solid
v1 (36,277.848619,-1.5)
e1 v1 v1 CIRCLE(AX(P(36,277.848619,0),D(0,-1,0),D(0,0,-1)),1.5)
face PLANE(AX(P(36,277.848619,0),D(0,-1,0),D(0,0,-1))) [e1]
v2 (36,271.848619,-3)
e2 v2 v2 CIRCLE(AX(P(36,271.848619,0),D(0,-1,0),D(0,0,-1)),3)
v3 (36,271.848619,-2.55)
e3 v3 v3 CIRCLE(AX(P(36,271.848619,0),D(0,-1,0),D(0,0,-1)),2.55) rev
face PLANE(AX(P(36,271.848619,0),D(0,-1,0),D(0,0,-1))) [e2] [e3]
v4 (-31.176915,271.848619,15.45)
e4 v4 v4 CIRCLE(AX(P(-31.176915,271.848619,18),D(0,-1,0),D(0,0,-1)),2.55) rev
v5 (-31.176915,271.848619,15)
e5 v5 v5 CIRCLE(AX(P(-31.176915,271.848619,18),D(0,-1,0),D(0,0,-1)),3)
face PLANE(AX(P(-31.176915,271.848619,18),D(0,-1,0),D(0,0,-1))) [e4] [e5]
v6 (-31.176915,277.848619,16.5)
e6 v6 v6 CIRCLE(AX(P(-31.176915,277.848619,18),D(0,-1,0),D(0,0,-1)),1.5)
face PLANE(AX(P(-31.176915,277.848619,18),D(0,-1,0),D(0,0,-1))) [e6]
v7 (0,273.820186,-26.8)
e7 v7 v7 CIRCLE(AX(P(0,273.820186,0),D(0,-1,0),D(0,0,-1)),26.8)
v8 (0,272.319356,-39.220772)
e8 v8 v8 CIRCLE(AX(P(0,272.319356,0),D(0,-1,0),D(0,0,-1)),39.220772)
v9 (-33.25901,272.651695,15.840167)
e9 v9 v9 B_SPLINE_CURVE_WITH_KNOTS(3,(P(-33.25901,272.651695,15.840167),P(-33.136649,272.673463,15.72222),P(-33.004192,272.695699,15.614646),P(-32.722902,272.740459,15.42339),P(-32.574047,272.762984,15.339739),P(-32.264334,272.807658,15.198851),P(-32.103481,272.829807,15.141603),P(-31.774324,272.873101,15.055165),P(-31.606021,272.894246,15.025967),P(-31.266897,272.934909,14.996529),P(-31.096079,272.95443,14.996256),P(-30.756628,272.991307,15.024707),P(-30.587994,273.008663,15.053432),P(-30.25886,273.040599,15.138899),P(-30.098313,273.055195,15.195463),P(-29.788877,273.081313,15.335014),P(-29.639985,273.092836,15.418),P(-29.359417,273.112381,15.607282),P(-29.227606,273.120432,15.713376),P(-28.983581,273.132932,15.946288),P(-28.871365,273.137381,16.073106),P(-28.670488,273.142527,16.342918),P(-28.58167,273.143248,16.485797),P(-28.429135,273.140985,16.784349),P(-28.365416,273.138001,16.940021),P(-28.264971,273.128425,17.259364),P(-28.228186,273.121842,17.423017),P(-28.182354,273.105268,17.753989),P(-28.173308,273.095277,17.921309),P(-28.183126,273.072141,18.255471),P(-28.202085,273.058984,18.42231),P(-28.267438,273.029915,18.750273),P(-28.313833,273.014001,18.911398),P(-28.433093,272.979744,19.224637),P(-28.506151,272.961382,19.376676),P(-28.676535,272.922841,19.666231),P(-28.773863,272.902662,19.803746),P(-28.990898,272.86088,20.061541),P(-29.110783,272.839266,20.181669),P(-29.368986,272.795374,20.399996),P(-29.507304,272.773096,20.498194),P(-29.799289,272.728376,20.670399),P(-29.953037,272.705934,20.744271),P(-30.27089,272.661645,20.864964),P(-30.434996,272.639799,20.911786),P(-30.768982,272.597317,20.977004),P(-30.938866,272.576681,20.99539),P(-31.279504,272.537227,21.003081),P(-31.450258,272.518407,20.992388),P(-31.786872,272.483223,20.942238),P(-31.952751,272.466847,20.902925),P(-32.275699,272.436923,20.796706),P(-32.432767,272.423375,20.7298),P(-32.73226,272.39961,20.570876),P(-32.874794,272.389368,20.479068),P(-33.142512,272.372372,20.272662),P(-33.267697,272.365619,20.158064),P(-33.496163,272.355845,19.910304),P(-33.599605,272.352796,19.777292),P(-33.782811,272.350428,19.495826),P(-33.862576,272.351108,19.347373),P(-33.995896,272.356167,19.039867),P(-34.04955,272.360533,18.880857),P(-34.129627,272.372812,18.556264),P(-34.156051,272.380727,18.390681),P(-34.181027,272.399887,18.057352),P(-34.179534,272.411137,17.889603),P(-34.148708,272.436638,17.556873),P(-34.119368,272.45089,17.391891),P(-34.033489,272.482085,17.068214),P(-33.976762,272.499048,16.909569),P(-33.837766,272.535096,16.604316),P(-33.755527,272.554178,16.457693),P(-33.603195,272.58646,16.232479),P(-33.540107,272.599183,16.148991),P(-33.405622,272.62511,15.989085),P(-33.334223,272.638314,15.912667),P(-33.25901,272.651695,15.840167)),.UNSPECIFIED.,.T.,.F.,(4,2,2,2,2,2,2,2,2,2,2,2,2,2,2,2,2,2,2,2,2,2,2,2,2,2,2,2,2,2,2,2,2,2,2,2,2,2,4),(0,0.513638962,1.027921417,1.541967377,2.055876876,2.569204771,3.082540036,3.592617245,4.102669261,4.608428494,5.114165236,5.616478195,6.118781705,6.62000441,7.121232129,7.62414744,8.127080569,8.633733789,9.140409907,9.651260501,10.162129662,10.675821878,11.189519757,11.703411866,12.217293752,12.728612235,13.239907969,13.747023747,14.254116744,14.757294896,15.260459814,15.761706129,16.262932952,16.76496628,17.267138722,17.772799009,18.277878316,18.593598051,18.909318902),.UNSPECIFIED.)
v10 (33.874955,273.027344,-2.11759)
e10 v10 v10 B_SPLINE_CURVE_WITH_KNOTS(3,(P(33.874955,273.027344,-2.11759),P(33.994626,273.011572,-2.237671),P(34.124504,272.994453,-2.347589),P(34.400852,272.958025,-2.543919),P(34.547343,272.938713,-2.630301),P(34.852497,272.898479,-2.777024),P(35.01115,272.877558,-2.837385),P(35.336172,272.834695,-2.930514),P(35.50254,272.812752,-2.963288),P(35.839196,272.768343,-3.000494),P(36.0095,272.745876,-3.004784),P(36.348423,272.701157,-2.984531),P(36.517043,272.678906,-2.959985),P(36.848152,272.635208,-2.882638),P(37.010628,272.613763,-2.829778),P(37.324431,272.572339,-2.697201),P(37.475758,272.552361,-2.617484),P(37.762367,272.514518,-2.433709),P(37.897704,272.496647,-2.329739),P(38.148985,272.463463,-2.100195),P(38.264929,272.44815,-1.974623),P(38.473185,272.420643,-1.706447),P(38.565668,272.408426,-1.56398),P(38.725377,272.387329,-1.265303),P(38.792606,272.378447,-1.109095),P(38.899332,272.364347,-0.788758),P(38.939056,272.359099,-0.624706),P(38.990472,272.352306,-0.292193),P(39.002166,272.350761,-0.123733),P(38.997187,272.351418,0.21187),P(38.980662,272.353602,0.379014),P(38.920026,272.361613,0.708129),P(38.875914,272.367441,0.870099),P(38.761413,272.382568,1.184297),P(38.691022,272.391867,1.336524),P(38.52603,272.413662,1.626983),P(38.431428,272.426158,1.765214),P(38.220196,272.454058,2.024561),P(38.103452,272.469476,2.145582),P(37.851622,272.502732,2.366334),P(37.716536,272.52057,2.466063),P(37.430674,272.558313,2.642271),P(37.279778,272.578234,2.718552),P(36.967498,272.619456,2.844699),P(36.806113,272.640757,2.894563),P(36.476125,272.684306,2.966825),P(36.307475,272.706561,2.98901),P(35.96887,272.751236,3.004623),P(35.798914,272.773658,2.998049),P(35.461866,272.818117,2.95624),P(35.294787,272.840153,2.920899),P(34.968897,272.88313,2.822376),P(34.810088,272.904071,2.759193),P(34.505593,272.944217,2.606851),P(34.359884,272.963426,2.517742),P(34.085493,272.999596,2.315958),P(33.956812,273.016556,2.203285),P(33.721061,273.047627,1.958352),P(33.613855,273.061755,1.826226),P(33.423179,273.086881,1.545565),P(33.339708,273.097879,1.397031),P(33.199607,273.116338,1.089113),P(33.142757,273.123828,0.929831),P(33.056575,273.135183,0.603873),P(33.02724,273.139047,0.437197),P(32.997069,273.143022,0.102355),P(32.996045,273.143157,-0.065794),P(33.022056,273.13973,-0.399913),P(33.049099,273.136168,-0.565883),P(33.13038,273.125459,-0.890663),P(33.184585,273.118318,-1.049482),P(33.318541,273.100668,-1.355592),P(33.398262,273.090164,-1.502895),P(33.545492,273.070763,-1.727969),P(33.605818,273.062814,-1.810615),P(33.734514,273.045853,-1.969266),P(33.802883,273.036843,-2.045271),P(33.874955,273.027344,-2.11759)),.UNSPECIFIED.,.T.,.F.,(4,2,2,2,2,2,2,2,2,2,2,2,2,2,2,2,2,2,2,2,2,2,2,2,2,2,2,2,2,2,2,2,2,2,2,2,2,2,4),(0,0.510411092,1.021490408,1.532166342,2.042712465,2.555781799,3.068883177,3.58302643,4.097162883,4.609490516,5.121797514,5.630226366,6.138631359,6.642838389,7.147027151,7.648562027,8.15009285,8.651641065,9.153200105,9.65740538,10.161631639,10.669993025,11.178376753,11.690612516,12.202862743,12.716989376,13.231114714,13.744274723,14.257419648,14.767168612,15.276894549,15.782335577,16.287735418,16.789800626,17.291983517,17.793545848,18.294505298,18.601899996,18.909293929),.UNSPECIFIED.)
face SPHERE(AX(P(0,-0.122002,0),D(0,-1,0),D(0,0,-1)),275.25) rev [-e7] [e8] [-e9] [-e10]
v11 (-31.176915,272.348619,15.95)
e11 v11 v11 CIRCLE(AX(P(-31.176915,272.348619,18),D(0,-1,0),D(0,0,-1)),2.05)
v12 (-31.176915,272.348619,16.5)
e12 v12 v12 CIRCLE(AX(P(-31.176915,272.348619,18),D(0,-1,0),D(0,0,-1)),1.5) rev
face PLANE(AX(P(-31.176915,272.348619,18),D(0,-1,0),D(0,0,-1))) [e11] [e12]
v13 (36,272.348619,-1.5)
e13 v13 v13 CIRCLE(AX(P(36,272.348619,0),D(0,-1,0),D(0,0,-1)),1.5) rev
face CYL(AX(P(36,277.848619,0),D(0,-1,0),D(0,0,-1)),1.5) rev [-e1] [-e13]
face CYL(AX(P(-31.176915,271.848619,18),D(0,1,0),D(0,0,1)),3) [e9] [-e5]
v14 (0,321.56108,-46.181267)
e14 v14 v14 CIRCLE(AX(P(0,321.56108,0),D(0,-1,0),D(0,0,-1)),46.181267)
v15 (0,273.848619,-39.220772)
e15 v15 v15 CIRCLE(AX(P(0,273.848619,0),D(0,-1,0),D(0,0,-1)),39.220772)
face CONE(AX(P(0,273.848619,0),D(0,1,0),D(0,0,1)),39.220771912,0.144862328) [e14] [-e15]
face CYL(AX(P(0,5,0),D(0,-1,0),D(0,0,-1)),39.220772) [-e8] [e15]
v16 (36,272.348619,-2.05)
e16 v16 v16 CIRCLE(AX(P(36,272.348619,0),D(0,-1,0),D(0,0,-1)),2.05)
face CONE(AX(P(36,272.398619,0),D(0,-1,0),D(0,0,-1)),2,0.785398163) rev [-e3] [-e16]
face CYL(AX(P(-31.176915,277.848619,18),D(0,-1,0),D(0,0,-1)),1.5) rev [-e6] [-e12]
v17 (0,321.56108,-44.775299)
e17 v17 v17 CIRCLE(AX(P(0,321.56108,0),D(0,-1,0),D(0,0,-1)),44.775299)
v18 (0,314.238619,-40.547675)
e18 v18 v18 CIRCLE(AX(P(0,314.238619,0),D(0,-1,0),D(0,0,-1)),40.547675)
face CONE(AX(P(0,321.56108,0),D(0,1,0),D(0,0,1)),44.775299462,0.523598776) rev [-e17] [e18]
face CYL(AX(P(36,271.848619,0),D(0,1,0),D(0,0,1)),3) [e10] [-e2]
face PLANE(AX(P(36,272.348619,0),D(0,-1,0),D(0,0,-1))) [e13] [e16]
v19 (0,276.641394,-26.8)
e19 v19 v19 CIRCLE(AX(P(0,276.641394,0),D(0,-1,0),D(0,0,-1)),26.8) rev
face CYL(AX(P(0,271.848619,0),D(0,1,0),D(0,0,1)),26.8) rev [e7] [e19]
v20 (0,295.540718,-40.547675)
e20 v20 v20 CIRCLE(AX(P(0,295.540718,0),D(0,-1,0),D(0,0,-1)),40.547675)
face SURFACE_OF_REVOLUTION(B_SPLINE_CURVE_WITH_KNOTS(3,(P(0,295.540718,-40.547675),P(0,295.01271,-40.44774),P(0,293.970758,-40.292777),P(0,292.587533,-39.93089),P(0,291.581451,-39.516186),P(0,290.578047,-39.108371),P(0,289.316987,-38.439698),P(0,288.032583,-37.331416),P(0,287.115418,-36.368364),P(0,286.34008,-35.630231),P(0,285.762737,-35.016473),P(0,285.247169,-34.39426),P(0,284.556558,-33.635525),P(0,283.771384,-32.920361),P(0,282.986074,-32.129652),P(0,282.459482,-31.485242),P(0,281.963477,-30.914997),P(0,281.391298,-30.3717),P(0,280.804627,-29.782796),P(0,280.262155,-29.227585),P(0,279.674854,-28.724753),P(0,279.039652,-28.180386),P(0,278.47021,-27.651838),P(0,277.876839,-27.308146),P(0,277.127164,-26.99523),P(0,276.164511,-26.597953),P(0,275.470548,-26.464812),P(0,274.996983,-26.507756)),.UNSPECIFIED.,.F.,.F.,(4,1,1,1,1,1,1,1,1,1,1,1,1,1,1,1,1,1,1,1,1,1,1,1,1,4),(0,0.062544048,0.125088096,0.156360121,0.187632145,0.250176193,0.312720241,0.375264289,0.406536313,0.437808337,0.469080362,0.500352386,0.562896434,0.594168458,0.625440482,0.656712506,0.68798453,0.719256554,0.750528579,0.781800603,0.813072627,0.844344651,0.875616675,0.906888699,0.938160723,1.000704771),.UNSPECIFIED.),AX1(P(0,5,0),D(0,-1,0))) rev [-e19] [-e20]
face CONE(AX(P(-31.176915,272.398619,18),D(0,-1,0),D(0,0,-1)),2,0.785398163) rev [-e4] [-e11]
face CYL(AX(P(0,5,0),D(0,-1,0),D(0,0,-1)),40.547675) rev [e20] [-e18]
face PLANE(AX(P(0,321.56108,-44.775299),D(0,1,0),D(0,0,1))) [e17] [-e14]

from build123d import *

# Parameters (mm, degrees)
SKETCH4_R           = 3
BOSS_EXTRUDE1_DEPTH = 2
SKETCH9_R           = 1.5
CUT_EXTRUDE1_DEPTH  = 6
SKETCH10_R          = 2
CUT_EXTRUDE2_DEPTH  = 0.5
CHAMFER3_SIZE       = 0.55
SKETCH11_R          = 26.8
CUT_EXTRUDE3_DEPTH  = 83.07769274


with BuildPart() as part:
    # Sketch2 → Revolve6 (revolve)
    with BuildSketch(Plane(origin=(0, 0, 0), x_dir=(0, 0, -1), z_dir=(1, 0, 0))):
        with BuildLine():
            Line((26.5077562, 274.996982717), (26.5077562, 273.848618937))
            Line((26.5077562, 273.848618937), (39.220771912, 273.848618937))
            Line((39.220771912, 273.848618937), (46.181267187, 321.561079724))
            Line((46.181267187, 321.561079724), (44.775299462, 321.561079724))
            Line((44.775299462, 321.561079724), (40.547674755, 314.238618937))
            Line((40.547674755, 314.238618937), (40.547674755, 295.540718438))
            add(Edge.make_bspline(
                [(40.547674755, 295.540718438), (40.447740466, 295.012709616), (40.292777353, 293.970757619), (39.930889755, 292.587532753), (39.516186416, 291.581451359), (39.108370782, 290.57804728), (38.439698054, 289.316986818), (37.331416086, 288.032583079), (36.368363881, 287.115418474), (35.630231264, 286.340079673), (35.016472726, 285.762737126), (34.394259795, 285.247169223), (33.635524662, 284.556557999), (32.920361334, 283.771384038), (32.129651901, 282.986073936), (31.485241784, 282.459482323), (30.914997208, 281.963476573), (30.371700346, 281.391298159), (29.782796159, 280.80462685), (29.227584581, 280.262154528), (28.724752618, 279.674853681), (28.180386253, 279.039651715), (27.651838315, 278.470209992), (27.308145935, 277.876839187), (26.995230081, 277.127164256), (26.597952618, 276.164510632), (26.464811583, 275.470548141), (26.5077562, 274.996982717)],
                knots=[0, 0, 0, 0, 0.062544048, 0.125088096, 0.156360121, 0.187632145, 0.250176193, 0.312720241, 0.375264289, 0.406536313, 0.437808337, 0.469080362, 0.500352386, 0.562896434, 0.594168458, 0.625440482, 0.656712506, 0.68798453, 0.719256554, 0.750528579, 0.781800603, 0.813072627, 0.844344651, 0.875616675, 0.906888699, 0.938160723, 1.000704771, 1.000704771, 1.000704771, 1.000704771], degree=3))
        make_face()
    revolve(axis=Axis((0, 5, 0), (0, 1, 0)))

    # Sketch4 → Boss-Extrude1 (add)
    with BuildSketch(Plane.XZ.offset(-273.848618937)):
        with Locations(Location((-31.176914536, 18, 0), (0, 0, 270))):
            Circle(SKETCH4_R)
        with Locations(Location((36, 0, 0), (0, 0, 270))):
            Circle(SKETCH4_R)
    extrude(amount=BOSS_EXTRUDE1_DEPTH)

    # Sketch7 → Revolve7 (revolve)
    with BuildSketch(Plane(origin=(0, 0, 0), x_dir=(0, 0, -1), z_dir=(1, 0, 0))):
        with BuildLine():
            Line((39.220771912, 273.848618937), (39.220771912, 272.319355593))
            ThreePointArc((39.220771912, 272.319355593), (32.873157949, 273.157923648), (26.5077562, 273.848618937))
            Line((26.5077562, 273.848618937), (26.5077562, 274.348618937))
            Line((26.5077562, 274.348618937), (39.220771912, 274.348618937))
            Line((39.220771912, 274.348618937), (39.220771912, 273.848618937))
        make_face()
    revolve(axis=Axis((0, 5, 0), (0, 1, 0)))

    # Sketch9 → Cut-Extrude1 (cut)
    with BuildSketch(Plane.XZ.offset(-271.848618937)):
        with Locations(Location((36, 0, 0), (0, 0, 270))):
            Circle(SKETCH9_R)
        with Locations(Location((-31.176914536, 18, 0), (0, 0, 270))):
            Circle(SKETCH9_R)
    extrude(amount=-CUT_EXTRUDE1_DEPTH, mode=Mode.SUBTRACT)

    # Sketch10 → Cut-Extrude2 (cut)
    with BuildSketch(Plane.XZ.offset(-271.848618937)):
        with Locations(Location((36, 0, 0), (0, 0, 270))):
            Circle(SKETCH10_R)
        with Locations(Location((-31.176914536, 18, 0), (0, 0, 270))):
            Circle(SKETCH10_R)
    extrude(amount=-CUT_EXTRUDE2_DEPTH, mode=Mode.SUBTRACT)

    # Chamfer3
    # the kernel refuses this chamfer: 0.55 mm, written as the material it takes off along each edge
    with BuildSketch(Plane(origin=(36, 271.848618937, 0), x_dir=(0, 0, -1), z_dir=(-1, 0, 0))) as chamfer3_piece_1_section:
        Polygon((2 + CHAMFER3_SIZE, 0), (2, -CHAMFER3_SIZE), (2, 0), align=None)
    chamfer3_piece_1 = revolve(axis=Axis((36, 271.848618937, 0), (0, -1, 0)), mode=Mode.PRIVATE)
    chamfer3_piece_1 = split(chamfer3_piece_1, bisect_by=Plane(origin=(36, 272.348618937, 2.298516155), z_dir=(0, -1, 0)), keep=Keep.TOP, mode=Mode.PRIVATE)
    add(chamfer3_piece_1, mode=Mode.SUBTRACT)
    with BuildSketch(Plane(origin=(-31.176914536, 271.848618937, 18), x_dir=(0, 0, -1), z_dir=(-1, 0, 0))) as chamfer3_piece_2_section:
        Polygon((2 + CHAMFER3_SIZE, 0), (2, -CHAMFER3_SIZE), (2, 0), align=None)
    chamfer3_piece_2 = revolve(axis=Axis((-31.176914536, 271.848618937, 18), (0, -1, 0)), mode=Mode.PRIVATE)
    chamfer3_piece_2 = split(chamfer3_piece_2, bisect_by=Plane(origin=(-31.176914536, 272.348618937, 20.298516155), z_dir=(0, -1, 0)), keep=Keep.TOP, mode=Mode.PRIVATE)
    add(chamfer3_piece_2, mode=Mode.SUBTRACT)

    # Sketch11 → Cut-Extrude3 (cut, through all)
    with BuildSketch(Plane(origin=(0, 321.561079724, 0), x_dir=(1, 0, 0), z_dir=(0, 1, 0))):
        with Locations(Location((0, 0, 0), (0, 0, 90))):
            Circle(SKETCH11_R)
    extrude(amount=-CUT_EXTRUDE3_DEPTH, mode=Mode.SUBTRACT)


solid = part.part
